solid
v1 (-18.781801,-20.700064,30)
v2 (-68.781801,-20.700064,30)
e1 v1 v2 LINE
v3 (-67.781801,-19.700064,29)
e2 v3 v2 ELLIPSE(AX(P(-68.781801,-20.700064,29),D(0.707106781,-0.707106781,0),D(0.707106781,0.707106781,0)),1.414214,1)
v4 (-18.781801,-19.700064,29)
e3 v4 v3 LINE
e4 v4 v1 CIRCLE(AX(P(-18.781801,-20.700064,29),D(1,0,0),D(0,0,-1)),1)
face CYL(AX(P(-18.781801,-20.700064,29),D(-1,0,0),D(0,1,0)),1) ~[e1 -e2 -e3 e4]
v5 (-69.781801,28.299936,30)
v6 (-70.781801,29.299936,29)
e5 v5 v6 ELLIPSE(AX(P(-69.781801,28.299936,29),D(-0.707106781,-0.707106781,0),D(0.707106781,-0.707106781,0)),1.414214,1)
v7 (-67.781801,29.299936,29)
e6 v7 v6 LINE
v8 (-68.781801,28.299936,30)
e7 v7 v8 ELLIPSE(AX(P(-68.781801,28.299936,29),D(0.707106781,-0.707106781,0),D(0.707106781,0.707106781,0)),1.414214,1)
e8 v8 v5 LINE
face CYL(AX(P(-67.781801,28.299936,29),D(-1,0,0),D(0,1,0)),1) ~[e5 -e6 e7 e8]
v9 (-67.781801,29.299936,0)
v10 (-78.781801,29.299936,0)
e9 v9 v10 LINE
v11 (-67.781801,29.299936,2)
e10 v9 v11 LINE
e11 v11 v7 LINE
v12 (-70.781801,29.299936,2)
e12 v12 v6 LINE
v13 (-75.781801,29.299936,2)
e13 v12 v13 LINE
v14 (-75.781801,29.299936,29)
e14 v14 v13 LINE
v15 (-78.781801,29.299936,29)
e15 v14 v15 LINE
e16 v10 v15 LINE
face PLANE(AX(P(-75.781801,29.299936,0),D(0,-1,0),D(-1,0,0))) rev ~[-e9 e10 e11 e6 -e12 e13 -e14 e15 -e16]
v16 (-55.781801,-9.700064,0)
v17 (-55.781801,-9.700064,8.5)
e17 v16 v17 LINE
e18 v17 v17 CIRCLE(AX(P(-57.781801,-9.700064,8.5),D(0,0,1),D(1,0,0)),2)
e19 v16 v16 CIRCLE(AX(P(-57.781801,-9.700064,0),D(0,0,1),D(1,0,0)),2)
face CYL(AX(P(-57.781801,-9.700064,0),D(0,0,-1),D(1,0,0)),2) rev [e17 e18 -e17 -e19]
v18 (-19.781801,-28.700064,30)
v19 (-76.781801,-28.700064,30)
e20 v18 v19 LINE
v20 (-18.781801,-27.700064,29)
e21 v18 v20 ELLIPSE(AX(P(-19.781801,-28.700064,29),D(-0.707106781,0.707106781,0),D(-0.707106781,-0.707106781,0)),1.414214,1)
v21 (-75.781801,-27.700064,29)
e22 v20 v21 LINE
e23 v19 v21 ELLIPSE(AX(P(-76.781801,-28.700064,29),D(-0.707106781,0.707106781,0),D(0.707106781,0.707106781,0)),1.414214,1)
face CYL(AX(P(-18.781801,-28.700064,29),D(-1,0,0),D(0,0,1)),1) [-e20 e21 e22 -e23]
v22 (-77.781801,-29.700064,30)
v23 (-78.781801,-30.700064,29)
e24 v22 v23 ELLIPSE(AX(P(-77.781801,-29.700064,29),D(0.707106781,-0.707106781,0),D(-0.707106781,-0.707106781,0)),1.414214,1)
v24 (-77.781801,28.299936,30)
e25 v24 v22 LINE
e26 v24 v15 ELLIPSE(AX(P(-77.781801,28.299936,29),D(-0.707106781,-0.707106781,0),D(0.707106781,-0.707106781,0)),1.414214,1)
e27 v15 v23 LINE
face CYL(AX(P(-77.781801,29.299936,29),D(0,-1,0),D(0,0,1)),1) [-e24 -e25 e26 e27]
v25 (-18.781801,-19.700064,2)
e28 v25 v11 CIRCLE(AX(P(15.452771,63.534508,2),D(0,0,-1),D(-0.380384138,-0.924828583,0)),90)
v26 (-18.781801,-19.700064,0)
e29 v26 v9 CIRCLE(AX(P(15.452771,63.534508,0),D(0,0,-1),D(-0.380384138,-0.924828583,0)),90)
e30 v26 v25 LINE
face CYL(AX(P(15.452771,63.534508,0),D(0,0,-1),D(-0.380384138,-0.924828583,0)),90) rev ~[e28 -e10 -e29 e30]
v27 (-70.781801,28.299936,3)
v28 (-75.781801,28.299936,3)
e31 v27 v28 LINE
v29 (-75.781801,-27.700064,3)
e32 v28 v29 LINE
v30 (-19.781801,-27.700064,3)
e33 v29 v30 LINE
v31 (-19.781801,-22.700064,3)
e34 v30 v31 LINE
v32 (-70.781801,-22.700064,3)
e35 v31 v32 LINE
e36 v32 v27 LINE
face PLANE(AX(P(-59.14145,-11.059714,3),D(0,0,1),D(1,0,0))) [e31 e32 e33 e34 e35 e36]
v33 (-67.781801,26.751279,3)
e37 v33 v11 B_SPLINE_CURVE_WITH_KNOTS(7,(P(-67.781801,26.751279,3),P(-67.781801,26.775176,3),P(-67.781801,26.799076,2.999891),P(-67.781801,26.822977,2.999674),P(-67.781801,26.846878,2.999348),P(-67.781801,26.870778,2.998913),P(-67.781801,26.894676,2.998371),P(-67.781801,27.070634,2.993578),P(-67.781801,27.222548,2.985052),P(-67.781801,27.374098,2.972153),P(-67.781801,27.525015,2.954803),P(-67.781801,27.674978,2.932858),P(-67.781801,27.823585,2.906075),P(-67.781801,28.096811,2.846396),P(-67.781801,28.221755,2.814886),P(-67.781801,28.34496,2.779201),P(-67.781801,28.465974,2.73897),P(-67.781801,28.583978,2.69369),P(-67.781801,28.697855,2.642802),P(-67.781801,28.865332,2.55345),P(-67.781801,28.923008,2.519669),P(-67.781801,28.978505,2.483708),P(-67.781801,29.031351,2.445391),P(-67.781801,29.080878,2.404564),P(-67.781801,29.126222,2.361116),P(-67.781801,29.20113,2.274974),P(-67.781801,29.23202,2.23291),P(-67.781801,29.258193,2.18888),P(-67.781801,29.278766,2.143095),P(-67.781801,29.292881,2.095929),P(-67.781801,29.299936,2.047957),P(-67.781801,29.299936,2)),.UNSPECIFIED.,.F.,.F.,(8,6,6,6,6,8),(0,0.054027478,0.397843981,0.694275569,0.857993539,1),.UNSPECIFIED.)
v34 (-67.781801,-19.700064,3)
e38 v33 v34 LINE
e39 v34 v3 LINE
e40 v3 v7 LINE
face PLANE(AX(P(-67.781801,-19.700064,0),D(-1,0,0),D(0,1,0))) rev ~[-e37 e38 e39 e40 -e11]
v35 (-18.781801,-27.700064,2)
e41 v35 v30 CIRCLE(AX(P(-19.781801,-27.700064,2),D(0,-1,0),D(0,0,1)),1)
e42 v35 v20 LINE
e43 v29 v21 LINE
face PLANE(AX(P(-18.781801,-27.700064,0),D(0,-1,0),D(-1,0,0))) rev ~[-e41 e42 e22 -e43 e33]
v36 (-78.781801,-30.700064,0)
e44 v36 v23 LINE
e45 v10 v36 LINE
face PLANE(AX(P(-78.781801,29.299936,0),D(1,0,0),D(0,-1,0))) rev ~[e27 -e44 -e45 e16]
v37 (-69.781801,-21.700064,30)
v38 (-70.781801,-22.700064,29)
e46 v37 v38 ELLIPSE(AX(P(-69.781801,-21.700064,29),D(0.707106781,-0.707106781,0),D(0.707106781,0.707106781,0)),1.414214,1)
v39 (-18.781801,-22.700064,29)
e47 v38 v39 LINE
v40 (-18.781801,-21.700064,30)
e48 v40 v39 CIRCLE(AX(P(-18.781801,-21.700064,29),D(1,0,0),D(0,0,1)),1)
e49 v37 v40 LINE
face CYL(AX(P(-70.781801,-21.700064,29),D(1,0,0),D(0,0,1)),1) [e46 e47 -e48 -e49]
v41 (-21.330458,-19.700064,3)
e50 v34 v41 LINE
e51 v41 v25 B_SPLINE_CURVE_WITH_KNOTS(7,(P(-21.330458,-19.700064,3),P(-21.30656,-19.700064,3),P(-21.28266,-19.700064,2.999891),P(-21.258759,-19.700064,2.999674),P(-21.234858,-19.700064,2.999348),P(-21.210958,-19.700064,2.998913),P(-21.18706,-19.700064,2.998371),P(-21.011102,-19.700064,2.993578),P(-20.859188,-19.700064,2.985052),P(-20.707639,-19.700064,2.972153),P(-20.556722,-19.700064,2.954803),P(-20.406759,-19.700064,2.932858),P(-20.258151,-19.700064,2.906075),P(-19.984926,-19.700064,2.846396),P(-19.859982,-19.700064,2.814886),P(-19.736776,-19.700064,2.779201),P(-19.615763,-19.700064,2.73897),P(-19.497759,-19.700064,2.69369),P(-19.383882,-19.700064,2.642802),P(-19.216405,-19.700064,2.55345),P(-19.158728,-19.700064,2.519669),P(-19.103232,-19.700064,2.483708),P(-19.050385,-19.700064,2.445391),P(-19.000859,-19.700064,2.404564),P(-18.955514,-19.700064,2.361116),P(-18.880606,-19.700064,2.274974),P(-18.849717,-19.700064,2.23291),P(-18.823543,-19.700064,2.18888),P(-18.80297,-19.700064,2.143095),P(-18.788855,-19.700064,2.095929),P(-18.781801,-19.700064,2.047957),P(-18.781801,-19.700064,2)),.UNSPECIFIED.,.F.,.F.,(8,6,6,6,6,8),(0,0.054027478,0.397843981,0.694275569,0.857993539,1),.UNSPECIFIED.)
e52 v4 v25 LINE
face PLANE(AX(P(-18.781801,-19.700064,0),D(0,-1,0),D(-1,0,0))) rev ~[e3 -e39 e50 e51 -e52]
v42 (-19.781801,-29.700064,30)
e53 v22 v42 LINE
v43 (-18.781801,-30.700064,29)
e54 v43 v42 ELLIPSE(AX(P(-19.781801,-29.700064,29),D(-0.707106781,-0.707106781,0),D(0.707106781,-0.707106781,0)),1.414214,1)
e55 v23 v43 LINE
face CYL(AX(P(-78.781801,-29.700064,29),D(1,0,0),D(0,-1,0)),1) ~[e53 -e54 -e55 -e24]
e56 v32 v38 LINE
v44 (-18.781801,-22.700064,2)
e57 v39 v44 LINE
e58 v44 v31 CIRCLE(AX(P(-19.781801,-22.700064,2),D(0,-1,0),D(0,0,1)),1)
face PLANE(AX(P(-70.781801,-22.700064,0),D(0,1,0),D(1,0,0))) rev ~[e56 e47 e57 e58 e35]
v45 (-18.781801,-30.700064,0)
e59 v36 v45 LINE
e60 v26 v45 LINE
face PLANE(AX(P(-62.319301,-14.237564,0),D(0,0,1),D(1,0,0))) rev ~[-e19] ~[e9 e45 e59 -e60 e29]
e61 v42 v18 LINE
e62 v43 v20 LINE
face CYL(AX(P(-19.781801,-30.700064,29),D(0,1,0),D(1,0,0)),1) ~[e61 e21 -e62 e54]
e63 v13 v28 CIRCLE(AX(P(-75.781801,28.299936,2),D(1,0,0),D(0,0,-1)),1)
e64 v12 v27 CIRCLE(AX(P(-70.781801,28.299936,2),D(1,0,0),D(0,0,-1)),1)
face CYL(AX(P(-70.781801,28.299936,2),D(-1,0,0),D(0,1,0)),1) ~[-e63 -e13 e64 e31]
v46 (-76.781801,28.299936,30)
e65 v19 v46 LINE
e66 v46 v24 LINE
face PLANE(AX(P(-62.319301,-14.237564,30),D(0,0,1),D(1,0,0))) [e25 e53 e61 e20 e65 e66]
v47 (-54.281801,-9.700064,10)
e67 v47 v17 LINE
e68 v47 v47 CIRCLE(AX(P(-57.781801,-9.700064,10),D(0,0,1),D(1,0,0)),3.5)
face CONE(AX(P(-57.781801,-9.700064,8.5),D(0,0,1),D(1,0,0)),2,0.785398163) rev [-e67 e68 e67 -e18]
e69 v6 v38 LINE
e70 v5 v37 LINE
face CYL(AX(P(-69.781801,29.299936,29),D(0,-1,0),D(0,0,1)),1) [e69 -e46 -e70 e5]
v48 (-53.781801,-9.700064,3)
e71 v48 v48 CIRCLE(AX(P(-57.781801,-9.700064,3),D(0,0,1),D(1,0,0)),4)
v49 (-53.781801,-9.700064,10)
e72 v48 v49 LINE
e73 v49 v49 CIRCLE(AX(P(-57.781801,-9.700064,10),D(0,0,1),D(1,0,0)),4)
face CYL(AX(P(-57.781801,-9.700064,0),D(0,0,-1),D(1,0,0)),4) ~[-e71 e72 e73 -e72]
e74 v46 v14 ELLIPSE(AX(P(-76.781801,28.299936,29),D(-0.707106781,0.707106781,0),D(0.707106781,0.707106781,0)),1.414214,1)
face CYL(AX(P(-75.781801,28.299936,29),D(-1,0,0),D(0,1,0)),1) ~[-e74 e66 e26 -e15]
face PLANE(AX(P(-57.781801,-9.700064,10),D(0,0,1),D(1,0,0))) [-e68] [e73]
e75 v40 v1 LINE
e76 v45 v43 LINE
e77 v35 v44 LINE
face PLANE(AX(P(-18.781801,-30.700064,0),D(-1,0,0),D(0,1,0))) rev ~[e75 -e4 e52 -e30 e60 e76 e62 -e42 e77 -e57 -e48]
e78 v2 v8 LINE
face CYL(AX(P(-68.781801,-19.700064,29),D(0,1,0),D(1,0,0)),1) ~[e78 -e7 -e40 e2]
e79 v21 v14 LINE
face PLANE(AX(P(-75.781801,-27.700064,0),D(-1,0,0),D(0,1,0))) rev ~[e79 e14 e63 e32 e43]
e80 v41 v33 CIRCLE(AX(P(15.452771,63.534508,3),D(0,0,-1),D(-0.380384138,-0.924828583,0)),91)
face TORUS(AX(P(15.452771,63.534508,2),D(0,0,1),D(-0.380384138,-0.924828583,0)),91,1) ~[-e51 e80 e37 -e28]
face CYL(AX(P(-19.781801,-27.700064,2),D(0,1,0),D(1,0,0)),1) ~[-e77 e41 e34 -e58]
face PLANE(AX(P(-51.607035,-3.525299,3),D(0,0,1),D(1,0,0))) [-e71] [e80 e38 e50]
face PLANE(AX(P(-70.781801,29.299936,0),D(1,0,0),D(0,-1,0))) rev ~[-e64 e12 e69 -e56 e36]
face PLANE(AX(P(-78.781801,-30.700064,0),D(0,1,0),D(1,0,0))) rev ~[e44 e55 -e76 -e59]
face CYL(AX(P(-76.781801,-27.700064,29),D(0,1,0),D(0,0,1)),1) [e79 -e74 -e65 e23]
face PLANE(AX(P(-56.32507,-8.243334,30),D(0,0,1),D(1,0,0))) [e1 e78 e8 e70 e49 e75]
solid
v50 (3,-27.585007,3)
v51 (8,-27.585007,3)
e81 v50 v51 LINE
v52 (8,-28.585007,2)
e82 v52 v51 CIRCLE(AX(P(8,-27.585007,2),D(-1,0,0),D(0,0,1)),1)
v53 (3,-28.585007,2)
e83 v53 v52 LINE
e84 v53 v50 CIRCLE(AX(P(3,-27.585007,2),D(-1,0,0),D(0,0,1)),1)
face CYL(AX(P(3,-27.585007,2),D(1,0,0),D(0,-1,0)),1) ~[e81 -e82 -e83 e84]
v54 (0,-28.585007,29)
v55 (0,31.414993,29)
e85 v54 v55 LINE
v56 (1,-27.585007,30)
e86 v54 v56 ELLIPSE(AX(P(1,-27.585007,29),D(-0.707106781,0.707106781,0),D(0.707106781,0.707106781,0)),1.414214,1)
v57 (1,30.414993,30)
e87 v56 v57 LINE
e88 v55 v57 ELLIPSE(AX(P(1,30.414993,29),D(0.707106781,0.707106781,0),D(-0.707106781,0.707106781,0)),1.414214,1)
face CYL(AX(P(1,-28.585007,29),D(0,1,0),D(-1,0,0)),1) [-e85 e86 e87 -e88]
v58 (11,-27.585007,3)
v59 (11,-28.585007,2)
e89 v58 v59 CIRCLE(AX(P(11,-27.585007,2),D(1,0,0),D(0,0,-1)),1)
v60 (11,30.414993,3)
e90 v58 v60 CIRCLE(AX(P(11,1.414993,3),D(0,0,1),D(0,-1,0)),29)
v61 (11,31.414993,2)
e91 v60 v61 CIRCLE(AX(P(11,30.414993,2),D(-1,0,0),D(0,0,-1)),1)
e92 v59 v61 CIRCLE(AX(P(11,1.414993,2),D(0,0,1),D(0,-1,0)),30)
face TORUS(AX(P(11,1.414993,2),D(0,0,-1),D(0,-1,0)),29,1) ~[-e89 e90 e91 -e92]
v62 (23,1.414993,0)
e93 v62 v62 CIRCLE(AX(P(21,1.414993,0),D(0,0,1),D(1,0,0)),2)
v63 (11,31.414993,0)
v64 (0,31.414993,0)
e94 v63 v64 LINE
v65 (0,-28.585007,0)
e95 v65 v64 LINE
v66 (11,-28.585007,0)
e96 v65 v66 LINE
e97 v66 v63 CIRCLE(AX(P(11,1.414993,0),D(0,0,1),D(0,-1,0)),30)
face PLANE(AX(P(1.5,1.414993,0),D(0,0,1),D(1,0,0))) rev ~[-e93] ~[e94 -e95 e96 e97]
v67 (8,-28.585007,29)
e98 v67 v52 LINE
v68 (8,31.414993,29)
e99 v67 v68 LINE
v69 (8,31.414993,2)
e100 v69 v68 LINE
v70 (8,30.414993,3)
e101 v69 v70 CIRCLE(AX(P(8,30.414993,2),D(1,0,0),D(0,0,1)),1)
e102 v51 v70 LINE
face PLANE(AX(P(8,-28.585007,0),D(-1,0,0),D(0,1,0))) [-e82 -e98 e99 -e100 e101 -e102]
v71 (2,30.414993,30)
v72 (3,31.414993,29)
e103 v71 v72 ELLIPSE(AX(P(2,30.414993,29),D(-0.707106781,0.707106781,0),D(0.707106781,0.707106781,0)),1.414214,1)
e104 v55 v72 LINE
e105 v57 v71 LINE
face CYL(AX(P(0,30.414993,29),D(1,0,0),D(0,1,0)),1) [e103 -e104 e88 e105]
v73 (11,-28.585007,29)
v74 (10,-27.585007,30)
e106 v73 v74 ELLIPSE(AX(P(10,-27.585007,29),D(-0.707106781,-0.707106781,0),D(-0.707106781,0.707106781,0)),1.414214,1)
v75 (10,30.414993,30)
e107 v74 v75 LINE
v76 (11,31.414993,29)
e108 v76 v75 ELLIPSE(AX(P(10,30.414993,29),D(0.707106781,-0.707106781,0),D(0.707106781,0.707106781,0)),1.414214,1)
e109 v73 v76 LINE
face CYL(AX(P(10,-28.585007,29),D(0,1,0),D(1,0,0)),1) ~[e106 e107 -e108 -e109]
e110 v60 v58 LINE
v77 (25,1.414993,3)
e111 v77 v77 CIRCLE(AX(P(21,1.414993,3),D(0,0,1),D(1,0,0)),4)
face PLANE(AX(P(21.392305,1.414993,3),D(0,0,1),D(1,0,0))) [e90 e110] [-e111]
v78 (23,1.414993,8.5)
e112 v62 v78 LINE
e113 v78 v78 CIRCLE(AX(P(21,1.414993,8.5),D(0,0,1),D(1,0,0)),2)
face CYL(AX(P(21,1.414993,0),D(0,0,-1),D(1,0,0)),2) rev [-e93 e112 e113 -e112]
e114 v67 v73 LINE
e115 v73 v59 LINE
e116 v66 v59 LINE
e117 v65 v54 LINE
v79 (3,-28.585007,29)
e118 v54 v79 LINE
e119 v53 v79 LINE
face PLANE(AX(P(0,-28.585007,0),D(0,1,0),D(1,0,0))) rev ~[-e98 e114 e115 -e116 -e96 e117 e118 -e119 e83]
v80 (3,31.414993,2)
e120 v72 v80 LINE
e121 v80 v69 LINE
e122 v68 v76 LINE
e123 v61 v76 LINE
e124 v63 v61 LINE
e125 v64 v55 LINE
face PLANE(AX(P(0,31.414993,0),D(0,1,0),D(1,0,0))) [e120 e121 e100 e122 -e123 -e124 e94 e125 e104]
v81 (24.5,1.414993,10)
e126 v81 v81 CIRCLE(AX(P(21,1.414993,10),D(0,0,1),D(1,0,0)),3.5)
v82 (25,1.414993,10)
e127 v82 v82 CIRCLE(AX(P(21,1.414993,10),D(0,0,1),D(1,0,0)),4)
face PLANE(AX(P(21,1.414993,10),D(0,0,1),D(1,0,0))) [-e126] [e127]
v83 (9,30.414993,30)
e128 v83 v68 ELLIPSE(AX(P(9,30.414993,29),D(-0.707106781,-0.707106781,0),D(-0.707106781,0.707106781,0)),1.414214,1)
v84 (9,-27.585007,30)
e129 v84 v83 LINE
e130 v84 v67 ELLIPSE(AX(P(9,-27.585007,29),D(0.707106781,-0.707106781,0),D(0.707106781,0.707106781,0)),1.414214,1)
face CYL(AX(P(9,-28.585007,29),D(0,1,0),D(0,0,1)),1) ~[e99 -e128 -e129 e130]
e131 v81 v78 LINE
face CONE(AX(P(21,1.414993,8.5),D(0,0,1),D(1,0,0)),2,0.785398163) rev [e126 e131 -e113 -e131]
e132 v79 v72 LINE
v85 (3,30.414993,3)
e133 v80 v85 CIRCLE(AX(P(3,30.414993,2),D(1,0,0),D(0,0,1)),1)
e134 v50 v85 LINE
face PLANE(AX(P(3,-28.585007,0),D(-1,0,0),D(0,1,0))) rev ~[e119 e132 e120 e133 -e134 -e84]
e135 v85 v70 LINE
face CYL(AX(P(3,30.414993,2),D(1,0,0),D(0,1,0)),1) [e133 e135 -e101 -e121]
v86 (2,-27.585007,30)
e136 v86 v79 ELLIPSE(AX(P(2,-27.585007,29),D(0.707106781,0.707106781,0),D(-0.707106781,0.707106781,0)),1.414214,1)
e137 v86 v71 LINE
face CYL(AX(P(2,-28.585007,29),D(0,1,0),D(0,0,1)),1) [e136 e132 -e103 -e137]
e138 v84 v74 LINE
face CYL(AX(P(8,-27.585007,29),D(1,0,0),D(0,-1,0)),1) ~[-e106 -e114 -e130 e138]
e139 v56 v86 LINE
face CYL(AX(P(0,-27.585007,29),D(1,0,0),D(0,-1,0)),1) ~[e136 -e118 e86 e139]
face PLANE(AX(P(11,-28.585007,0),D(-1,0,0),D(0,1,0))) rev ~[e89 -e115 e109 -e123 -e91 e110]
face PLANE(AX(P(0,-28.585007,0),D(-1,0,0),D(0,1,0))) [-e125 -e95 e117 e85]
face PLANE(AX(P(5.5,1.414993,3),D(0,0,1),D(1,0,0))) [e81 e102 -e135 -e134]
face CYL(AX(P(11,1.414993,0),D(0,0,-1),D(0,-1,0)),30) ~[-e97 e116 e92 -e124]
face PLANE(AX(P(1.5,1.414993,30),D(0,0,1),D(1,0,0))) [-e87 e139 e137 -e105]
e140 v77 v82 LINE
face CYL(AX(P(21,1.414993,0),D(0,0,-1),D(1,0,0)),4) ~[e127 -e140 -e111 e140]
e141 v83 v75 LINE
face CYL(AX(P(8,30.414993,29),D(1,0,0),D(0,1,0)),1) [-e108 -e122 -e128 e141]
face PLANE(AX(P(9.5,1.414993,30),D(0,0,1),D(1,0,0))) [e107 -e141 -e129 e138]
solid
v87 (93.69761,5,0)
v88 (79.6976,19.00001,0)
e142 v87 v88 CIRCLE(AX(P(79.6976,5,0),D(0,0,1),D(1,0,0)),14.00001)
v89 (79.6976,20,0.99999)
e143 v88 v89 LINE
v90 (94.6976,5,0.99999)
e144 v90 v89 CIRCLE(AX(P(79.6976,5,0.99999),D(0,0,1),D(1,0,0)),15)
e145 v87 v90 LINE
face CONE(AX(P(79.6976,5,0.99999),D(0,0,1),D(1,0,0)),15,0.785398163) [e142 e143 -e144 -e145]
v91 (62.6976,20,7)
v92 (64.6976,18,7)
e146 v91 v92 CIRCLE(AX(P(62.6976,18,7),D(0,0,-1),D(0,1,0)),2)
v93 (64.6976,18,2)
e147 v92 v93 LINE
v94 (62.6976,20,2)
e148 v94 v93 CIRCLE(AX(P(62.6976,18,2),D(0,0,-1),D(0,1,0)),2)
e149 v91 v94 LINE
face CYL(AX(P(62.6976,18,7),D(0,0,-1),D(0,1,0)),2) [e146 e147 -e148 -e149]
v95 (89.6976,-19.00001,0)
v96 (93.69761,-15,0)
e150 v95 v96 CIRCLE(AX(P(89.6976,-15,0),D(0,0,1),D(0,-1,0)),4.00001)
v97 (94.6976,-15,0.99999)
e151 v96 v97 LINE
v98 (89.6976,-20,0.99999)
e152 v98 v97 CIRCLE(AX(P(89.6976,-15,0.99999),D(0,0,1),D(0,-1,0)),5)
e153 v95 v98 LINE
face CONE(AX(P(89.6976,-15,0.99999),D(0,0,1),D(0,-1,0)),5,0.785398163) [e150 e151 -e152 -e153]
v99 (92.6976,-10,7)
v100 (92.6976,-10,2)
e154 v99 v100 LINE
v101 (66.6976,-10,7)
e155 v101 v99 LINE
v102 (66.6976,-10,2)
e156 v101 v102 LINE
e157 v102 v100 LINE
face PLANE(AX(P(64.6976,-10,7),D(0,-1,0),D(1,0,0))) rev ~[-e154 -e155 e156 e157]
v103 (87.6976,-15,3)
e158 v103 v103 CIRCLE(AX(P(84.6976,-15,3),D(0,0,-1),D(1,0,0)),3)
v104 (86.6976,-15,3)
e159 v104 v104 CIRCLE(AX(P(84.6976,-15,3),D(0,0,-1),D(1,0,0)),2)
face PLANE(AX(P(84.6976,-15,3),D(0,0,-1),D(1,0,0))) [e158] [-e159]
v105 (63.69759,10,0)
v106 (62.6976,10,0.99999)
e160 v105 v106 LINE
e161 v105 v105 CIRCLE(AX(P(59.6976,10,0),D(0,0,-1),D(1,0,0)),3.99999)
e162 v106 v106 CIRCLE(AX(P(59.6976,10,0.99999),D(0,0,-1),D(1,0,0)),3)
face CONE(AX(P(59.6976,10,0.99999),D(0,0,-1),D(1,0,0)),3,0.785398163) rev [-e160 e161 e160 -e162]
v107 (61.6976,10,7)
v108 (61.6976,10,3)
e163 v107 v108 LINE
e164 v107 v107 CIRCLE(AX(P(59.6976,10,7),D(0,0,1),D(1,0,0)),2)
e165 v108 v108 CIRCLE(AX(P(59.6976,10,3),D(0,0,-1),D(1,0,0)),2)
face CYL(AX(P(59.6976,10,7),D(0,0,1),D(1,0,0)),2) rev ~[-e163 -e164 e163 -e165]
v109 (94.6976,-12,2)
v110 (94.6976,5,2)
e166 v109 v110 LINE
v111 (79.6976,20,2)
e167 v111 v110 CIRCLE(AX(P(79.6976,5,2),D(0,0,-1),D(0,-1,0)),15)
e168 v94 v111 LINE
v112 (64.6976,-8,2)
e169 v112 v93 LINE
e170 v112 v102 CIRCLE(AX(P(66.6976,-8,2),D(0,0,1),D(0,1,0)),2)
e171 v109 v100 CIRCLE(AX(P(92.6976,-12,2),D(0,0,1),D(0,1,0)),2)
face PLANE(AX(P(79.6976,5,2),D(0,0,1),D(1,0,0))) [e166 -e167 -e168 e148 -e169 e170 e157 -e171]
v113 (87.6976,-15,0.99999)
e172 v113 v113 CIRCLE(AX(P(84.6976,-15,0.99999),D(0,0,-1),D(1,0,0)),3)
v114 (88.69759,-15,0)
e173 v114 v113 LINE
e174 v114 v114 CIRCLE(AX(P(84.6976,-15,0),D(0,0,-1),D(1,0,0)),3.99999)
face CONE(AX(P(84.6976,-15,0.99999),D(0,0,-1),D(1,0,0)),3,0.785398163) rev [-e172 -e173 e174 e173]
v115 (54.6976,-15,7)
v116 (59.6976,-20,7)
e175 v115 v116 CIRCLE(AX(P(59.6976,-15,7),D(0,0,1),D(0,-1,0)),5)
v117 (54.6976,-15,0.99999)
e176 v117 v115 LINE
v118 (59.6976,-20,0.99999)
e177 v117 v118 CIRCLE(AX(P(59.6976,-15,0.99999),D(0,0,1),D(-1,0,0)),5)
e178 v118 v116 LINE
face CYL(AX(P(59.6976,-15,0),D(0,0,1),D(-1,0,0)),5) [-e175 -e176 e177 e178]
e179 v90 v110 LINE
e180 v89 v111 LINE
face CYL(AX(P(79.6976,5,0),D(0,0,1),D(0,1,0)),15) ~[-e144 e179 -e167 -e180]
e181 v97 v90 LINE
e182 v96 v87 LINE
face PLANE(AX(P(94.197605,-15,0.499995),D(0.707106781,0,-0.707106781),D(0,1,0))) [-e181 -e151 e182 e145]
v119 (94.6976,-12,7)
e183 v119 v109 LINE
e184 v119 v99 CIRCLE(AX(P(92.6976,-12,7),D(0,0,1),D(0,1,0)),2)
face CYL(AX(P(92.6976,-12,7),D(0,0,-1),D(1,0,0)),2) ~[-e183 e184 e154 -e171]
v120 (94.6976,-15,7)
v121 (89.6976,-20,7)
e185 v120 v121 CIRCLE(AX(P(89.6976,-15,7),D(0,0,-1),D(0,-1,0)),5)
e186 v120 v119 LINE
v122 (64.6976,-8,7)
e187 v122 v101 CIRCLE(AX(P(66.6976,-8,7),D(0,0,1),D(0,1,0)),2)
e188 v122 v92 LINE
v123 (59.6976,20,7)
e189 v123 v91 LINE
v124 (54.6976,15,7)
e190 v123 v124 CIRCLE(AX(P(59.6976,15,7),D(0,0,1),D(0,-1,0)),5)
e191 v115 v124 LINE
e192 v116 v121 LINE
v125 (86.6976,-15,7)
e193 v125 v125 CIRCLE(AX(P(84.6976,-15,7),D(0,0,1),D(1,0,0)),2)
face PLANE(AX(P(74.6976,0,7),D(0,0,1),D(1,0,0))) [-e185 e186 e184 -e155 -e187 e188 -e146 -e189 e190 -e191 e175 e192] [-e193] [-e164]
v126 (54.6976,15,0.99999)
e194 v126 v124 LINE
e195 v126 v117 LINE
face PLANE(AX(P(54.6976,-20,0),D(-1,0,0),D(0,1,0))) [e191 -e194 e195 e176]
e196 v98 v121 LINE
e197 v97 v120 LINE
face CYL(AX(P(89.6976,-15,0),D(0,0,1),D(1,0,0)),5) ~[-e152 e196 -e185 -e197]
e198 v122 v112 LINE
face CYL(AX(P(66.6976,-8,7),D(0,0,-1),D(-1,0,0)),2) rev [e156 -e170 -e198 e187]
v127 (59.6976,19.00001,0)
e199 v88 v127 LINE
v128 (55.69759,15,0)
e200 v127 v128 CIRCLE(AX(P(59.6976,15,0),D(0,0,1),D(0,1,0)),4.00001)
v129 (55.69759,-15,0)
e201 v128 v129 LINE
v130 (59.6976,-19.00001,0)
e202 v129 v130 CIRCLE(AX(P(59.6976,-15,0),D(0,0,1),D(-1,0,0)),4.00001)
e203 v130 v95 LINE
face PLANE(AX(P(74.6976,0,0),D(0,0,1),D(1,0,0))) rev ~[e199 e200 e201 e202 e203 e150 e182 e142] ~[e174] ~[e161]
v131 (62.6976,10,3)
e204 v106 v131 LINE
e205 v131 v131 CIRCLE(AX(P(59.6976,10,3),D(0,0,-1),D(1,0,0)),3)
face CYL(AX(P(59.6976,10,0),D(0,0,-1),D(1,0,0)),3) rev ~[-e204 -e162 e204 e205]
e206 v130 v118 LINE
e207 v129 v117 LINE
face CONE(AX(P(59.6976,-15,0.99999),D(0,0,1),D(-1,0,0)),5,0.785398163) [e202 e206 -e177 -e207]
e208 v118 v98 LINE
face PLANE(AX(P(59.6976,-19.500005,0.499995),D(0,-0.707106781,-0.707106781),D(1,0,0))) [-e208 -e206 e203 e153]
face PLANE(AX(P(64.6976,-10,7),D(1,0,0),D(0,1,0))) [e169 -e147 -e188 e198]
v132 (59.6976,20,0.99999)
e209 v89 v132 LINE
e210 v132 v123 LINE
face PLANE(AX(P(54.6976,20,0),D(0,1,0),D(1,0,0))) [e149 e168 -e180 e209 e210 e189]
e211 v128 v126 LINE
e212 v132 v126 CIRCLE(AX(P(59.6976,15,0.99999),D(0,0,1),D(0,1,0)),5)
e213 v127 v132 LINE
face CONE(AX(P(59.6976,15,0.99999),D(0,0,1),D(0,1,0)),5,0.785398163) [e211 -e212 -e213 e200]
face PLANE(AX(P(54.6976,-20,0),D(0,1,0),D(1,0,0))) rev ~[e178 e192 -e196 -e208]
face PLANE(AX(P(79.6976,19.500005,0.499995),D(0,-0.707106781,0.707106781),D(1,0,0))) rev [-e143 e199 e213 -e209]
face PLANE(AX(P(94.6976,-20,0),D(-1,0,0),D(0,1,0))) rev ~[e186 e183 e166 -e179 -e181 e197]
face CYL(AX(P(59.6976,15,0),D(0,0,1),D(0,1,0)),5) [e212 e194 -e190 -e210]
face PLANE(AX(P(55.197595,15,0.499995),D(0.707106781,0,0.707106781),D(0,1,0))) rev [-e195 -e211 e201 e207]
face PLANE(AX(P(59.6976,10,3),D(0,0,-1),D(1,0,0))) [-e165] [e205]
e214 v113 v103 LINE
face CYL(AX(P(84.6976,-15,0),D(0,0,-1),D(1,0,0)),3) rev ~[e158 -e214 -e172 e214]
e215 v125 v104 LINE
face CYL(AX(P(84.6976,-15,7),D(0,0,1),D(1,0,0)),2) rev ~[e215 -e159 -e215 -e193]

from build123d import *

# Parameters (mm, degrees)
F0_R      = 4
F1_DEPTH  = 3
F2_DEPTH  = 30
F0_R_2    = 2
F3_DEPTH  = 10
F4_R      = 1
F5_SIZE   = 1.5
F6_W      = 5
F6_H      = 60
F7_DEPTH  = 3
F6_R      = 4
F6_W_2    = 3
F8_DEPTH  = 30
F6_R_2    = 2
F9_DEPTH  = 10
F10_SIZE  = 1.5
F11_R     = 1
F12_W     = 40
F12_H     = 40
F13_DEPTH = 7
F14_W     = 30
F14_H     = 30
F15_DEPTH = 5
F14_R     = 2
F16_DEPTH = 25
F17_R     = 3
F17_R_2   = 2
F18_DEPTH = 3
F19_R     = 15
F20_R     = 5
F21_SIZE  = 0.99999
F22_R     = 2


# Not quite as in the source:
# - a fillet or chamfer is up to 0.001 mm smaller than in the source, because OpenCascade refuses the exact size


with BuildPart() as f1:
    # F0 (on Top) → F1 (new body)
    with BuildSketch(Plane.XY):
        with BuildLine():
            ThreePointArc((-18.7818011097, -19.7000644691), (-48.186838974, -0.1051023334), (-67.7818011097, 29.2999355309))
            Line((-67.7818011097, 29.2999355309), (-67.7818011097, -19.7000644691))
            Line((-67.7818011097, -19.7000644691), (-18.7818011097, -19.7000644691))
        make_face()
        with Locations((-57.7818011097, -9.7000644691)):
            Circle(F0_R, mode=Mode.SUBTRACT)
    extrude(amount=F1_DEPTH)



with BuildPart() as f1b:
    # F0 (on Top) → F1, piece 2 (new body)
    with BuildSketch(Plane.XY):
        Polygon((-70.7818011097, 29.2999355309), (-75.7818011097, 29.2999355309), (-75.7818011097, -27.7000644691), (-18.7818011097, -27.7000644691), (-18.7818011097, -22.7000644691), (-70.7818011097, -22.7000644691), align=None)
    extrude(amount=F1_DEPTH)


with BuildPart() as f1_1:
    add(f1.part)

    add(f1b.part)  # F2 merges F1b
    # F0 (on Top) → F2 (join)
    with BuildSketch(Plane.XY):
        Polygon((-75.7818011097, 29.2999355309), (-78.7818011097, 29.2999355309), (-78.7818011097, -30.7000644691), (-18.7818011097, -30.7000644691), (-18.7818011097, -27.7000644691), (-75.7818011097, -27.7000644691), align=None)
        Polygon((-67.7818011097, 29.2999355309), (-70.7818011097, 29.2999355309), (-70.7818011097, -22.7000644691), (-18.7818011097, -22.7000644691), (-18.7818011097, -19.7000644691), (-67.7818011097, -19.7000644691), align=None)
    extrude(amount=F2_DEPTH)

    # F0 (on Top) → F3 (join)
    with BuildSketch(Plane.XY):
        with Locations((-57.7818011097, -9.7000644691)):
            Circle(F0_R)
        with Locations((-57.7818011097, -9.7000644691)):
            Circle(F0_R_2, mode=Mode.SUBTRACT)
    extrude(amount=F3_DEPTH)

    # F4
    f4_edges = [f1_1.edges().sort_by_distance(p)[0] for p in [
        (-78.781801, -0.700064, 30),
        (-48.781801, -30.700064, 30),
        (-44.781801, -22.700064, 30),
        (-70.781801, 3.299936, 30),
        (-67.781801, 4.799936, 30),
        (-43.281801, -19.700064, 30),
        (-75.781801, 0.799936, 30),
        (-47.281801, -27.700064, 30),
        (-77.281801, 29.299936, 30),
        (-69.281801, 29.299936, 30),
        (-18.781801, -29.200064, 30),
        (-48.186839, -0.105102, 3),
        (-18.781801, -25.200064, 3),
        (-73.281801, 29.299936, 3),
    ]]
    fillet(f4_edges, radius=F4_R)

    # F5
    f5_edges = [f1_1.edges().sort_by_distance(p)[0] for p in [
        (-59.781801, -9.700064, 10),
    ]]
    chamfer(f5_edges, length=F5_SIZE)


with BuildPart() as f7:
    # F6 (on Top) → F7 (new body)
    with BuildSketch(Plane.XY):
        with Locations((5.5, 1.4149925858)):
            Rectangle(F6_W, F6_H)
    extrude(amount=F7_DEPTH)



with BuildPart() as f7b:
    # F6 (on Top) → F7, piece 2 (new body)
    with BuildSketch(Plane.XY):
        with BuildLine():
            ThreePointArc((11, -28.5850074142), (41, 1.4149925858), (11, 31.4149925858))
            Line((11, 31.4149925858), (11, -28.5850074142))
        make_face()
        with Locations((21, 1.4149925858)):
            Circle(F6_R, mode=Mode.SUBTRACT)
    extrude(amount=F7_DEPTH)


with BuildPart() as f7_1:
    add(f7.part)

    add(f7b.part)  # F8 merges F7b
    # F6 (on Top) → F8 (join)
    with BuildSketch(Plane.XY):
        with Locations((1.5, 1.4149925858)):
            Rectangle(F6_W_2, F6_H)
        with Locations((9.5, 1.4149925858)):
            Rectangle(F6_W_2, F6_H)
    extrude(amount=F8_DEPTH)

    # F6 (on Top) → F9 (join)
    with BuildSketch(Plane.XY):
        with Locations((21, 1.4149925858)):
            Circle(F6_R)
        with Locations((21, 1.4149925858)):
            Circle(F6_R_2, mode=Mode.SUBTRACT)
    extrude(amount=F9_DEPTH)

    # F10
    f10_edges = [f7_1.edges().sort_by_distance(p)[0] for p in [
        (19, 1.414993, 10),
    ]]
    chamfer(f10_edges, length=F10_SIZE)

    # F11
    f11_edges = [f7_1.edges().sort_by_distance(p)[0] for p in [
        (0, 1.414993, 30),
        (3, 1.414993, 30),
        (8, 1.414993, 30),
        (11, 1.414993, 30),
        (9.5, -28.585007, 30),
        (1.5, -28.585007, 30),
        (5.5, -28.585007, 3),
        (41, 1.414993, 3),
        (1.5, 31.414993, 30),
        (9.5, 31.414993, 30),
        (5.5, 31.414993, 3),
    ]]
    fillet(f11_edges, radius=F11_R)


with BuildPart() as f13:
    # F12 (on Top) → F13 (new body)
    with BuildSketch(Plane.XY):
        with Locations((74.6976004541, 0)):
            Rectangle(F12_W, F12_H)
    extrude(amount=F13_DEPTH)

    # F14 (on face) → F15 (cut)
    with BuildSketch(Plane.XY.offset(7)):
        with Locations((79.6976004541, 5)):
            Rectangle(F14_W, F14_H)
    extrude(amount=-F15_DEPTH, mode=Mode.SUBTRACT)

    # F14 (on face) → F16 (cut)
    with BuildSketch(Plane.XY.offset(7)):
        with Locations((59.6976004541, 10)):
            Circle(F14_R)
        with Locations((84.6976004541, -15)):
            Circle(F14_R)
    extrude(amount=-F16_DEPTH, mode=Mode.SUBTRACT)

    # F17 (on face) → F18 (cut)
    with BuildSketch(Plane(origin=(0, 0, 0), x_dir=(1, 0, 0), z_dir=(0, 0, -1))):
        with Locations((59.6976004541, -10)):
            Circle(F17_R)
        with Locations((59.6976004541, -10)):
            Circle(F17_R_2, mode=Mode.SUBTRACT)
        with Locations((84.6976004541, 15)):
            Circle(F17_R)
        with Locations((84.6976004541, 15)):
            Circle(F17_R_2, mode=Mode.SUBTRACT)
    extrude(amount=-F18_DEPTH, mode=Mode.SUBTRACT)

    # F19
    f19_edges = [f13.edges().sort_by_distance(p)[0] for p in [
        (94.6976, 20, 1),
    ]]
    fillet(f19_edges, radius=F19_R)

    # F20
    f20_edges = [f13.edges().sort_by_distance(p)[0] for p in [
        (54.6976, 20, 3.5),
        (94.6976, -20, 3.5),
        (54.6976, -20, 3.5),
    ]]
    fillet(f20_edges, radius=F20_R)

    # F21 (size 1 in the source; OpenCascade refuses exactly that, so slightly less here)
    f21_edges = [f13.edges().sort_by_distance(p)[0] for p in [
        (94.6976, -5, 0),
        (56.6976, 10, 0),
        (81.6976, -15, 0),
    ]]
    chamfer(f21_edges, length=F21_SIZE)

    # F22
    f22_edges = [f13.edges().sort_by_distance(p)[0] for p in [
        (64.6976, 20, 4.5),
        (94.6976, -10, 4.5),
        (64.6976, -10, 4.5),
    ]]
    fillet(f22_edges, radius=F22_R)


solid = Compound([f1_1.part, f7_1.part, f13.part])
